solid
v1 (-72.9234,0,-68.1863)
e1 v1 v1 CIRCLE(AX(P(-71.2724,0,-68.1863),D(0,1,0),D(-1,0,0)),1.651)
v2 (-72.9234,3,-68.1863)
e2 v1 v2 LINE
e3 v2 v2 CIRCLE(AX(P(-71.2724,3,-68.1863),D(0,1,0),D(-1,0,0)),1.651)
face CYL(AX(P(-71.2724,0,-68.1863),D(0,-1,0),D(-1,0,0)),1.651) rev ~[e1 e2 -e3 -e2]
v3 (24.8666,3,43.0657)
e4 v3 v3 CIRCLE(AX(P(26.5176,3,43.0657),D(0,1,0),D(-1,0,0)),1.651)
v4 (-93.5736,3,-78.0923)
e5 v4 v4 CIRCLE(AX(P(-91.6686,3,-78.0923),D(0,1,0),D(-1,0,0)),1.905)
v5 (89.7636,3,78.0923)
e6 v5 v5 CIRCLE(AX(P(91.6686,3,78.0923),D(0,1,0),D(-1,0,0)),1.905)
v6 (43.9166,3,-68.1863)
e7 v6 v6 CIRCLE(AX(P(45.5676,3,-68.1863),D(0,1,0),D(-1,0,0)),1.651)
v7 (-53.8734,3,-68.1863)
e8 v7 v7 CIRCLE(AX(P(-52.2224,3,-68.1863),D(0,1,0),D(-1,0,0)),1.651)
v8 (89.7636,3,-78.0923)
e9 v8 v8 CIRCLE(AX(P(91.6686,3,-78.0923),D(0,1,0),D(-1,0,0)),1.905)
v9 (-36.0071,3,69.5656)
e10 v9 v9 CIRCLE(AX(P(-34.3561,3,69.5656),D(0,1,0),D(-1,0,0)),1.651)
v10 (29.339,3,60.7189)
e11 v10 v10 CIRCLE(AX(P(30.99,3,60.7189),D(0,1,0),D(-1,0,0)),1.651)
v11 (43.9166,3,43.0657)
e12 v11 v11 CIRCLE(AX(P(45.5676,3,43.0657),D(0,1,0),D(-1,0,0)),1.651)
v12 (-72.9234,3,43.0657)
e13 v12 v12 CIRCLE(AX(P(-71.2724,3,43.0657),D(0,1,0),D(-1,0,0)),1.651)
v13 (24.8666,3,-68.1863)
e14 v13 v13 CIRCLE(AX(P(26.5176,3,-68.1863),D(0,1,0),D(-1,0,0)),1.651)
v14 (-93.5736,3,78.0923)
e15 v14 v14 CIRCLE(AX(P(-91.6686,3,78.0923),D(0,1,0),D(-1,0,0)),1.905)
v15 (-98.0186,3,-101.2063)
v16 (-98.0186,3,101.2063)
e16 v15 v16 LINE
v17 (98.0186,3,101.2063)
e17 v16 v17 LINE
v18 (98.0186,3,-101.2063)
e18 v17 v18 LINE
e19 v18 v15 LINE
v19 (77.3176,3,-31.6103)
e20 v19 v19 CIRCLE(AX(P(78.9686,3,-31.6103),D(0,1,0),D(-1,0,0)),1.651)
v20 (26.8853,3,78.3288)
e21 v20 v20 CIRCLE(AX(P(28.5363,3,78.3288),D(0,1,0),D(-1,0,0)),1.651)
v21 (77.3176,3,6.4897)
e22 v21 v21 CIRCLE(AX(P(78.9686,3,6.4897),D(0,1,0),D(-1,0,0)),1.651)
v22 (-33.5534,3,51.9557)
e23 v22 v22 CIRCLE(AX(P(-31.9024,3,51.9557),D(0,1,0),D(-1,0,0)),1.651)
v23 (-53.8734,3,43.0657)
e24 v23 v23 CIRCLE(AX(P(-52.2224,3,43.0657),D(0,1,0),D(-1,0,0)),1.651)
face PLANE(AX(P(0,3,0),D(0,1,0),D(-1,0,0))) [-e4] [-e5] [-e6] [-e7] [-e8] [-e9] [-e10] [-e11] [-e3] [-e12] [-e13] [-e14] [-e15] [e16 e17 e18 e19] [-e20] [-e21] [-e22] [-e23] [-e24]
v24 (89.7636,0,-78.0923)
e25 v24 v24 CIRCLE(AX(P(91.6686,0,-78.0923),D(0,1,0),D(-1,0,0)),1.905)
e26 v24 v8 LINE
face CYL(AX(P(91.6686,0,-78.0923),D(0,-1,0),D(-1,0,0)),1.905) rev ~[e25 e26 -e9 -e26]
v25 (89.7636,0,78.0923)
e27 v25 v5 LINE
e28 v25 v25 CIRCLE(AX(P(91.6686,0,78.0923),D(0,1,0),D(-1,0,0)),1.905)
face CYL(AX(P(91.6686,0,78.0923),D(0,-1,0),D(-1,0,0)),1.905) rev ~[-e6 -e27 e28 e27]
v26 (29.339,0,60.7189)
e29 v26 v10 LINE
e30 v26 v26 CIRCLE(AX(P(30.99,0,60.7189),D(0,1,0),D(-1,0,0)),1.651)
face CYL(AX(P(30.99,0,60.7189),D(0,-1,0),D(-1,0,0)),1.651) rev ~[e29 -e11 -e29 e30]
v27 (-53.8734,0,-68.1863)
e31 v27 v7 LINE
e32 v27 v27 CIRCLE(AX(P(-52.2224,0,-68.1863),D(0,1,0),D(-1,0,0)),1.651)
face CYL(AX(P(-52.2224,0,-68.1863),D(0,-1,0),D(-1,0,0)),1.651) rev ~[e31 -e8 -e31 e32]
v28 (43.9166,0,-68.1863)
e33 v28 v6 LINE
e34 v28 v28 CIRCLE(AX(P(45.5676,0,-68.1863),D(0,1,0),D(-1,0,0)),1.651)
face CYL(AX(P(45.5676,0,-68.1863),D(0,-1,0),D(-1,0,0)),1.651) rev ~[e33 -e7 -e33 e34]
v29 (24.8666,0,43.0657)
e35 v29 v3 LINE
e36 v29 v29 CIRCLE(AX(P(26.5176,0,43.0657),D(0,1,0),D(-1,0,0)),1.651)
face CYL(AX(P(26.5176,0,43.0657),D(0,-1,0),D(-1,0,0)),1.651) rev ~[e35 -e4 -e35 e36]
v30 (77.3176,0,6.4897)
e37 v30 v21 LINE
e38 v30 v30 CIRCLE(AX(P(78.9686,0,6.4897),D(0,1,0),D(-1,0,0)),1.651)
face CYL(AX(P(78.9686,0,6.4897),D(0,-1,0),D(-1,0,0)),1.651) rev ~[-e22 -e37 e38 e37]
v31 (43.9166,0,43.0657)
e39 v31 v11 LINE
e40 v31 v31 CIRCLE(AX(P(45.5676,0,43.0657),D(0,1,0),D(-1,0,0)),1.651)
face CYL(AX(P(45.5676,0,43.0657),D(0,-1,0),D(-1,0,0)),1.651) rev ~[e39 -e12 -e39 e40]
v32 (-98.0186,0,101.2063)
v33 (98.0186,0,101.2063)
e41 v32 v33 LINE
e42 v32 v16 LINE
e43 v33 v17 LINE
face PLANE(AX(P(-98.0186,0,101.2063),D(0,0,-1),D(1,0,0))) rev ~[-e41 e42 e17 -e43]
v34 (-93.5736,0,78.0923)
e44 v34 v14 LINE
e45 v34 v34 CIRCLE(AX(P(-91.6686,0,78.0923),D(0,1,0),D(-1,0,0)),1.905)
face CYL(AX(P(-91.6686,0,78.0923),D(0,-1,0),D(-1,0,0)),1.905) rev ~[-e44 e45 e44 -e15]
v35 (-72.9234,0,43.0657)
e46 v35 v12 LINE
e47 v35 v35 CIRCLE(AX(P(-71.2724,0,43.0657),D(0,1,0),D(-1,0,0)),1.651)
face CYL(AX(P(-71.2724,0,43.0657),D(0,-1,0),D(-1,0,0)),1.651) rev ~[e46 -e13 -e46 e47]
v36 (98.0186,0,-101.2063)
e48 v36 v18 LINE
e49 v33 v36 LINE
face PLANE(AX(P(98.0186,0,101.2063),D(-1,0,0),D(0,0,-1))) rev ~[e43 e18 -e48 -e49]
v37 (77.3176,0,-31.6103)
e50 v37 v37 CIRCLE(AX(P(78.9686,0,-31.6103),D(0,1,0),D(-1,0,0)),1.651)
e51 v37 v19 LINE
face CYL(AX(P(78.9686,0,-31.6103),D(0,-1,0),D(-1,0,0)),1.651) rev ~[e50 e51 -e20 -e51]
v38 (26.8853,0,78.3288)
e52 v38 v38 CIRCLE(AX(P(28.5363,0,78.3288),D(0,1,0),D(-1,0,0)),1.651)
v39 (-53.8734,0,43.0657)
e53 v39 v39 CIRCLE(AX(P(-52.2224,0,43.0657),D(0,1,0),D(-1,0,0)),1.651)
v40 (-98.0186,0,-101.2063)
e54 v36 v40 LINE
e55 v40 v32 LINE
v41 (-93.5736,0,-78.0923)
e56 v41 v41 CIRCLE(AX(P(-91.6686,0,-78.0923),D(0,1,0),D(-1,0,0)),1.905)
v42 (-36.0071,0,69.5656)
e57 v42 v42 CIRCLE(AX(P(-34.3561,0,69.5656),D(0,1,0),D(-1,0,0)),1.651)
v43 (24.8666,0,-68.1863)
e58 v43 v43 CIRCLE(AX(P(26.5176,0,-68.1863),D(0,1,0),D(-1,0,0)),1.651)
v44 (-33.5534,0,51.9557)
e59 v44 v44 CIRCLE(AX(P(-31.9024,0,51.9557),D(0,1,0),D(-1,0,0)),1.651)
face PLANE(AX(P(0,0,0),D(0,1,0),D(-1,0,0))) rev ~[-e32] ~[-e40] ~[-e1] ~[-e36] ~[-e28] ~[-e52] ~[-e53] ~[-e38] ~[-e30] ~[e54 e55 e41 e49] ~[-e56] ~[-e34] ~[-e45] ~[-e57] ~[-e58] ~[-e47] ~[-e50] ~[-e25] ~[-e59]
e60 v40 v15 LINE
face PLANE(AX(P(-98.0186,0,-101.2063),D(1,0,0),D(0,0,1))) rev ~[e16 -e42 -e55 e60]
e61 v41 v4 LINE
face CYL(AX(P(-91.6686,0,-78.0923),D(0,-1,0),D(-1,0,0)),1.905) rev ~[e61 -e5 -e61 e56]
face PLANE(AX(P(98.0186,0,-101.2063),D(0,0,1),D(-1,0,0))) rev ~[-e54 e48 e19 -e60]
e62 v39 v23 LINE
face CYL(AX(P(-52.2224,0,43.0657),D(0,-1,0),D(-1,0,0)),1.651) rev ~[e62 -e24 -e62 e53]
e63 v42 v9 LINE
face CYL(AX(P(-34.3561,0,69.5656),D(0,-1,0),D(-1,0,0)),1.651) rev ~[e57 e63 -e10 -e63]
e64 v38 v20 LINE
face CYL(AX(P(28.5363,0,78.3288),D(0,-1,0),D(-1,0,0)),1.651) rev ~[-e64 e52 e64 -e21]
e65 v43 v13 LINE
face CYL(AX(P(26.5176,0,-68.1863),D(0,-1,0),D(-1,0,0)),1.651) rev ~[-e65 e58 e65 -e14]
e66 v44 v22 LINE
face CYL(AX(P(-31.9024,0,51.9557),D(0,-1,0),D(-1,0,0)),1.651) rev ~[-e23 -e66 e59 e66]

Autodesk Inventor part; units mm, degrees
ref_plane "YZ Plane" through (0, 0, 0) normal (1, 0, 0) x (0, 1, 0)
ref_plane "XZ Plane" through (0, 0, 0) normal (0, 1, 0) x (-1, 0, 0)
ref_plane "XY Plane" through (0, 0, 0) normal (0, 0, 1) x (1, 0, 0)
sketch "Block1" plane through (0, 0, 0) normal (0, 0, 1) x (1, 0, 0)
  circle A0 centre (244.9891, 313.0766) radius 1.651
  circle A1 centre (305.4278, 286.7035) radius 1.651
  circle A2 centre (242.5353, 295.4667) radius 1.651
  circle A3 centre (307.8815, 304.3134) radius 1.651
  circle A4 centre (325.7478, 277.8135) radius 1.651
  circle A5 centre (227.9578, 277.8135) radius 1.651
  circle A6 centre (194.5568, 203.1375) radius 1.651
  circle A7 centre (325.7478, 166.5615) radius 1.651
  circle A8 centre (227.9578, 166.5615) radius 1.651
  circle A9 centre (247.0078, 166.5615) radius 1.651
  circle A10 centre (344.7978, 166.5615) radius 1.651
  circle A11 centre (194.5568, 241.2375) radius 1.651
  circle A12 centre (247.0078, 277.8135) radius 1.651
  circle A13 centre (344.7978, 277.8135) radius 1.651
  circle A14 centre (181.8568, 156.6555) radius 1.905
  circle A15 centre (181.8568, 312.8401) radius 1.905
  circle A16 centre (365.194, 312.8401) radius 1.905
  circle A17 centre (365.194, 156.6555) radius 1.905
  line L0 (371.544, 133.5415) -> (371.544, 335.9541)
  line L1 (175.5068, 133.5415) -> (371.544, 133.5415)
  line L2 (175.5068, 335.9541) -> (175.5068, 133.5415)
  line L3 (371.544, 335.9541) -> (175.5068, 335.9541)
  point P0 (271.6644, 239.9388)
sketch "Sketch1" plane through (0, 0, 0) normal (0, 1, 0) x (-1, 0, 0)
  circle A0 centre (-28.5363, 78.3288) radius 1.651
  circle A1 centre (31.9024, 51.9557) radius 1.651
  circle A2 centre (-30.99, 60.7189) radius 1.651
  circle A3 centre (34.3561, 69.5656) radius 1.651
  circle A4 centre (52.2224, 43.0657) radius 1.651
  circle A5 centre (-45.5676, 43.0657) radius 1.651
  circle A6 centre (-78.9686, -31.6103) radius 1.651
  circle A7 centre (52.2224, -68.1863) radius 1.651
  circle A8 centre (-45.5676, -68.1863) radius 1.651
  circle A9 centre (-26.5176, -68.1863) radius 1.651
  circle A10 centre (71.2724, -68.1863) radius 1.651
  circle A11 centre (-78.9686, 6.4897) radius 1.651
  circle A12 centre (-26.5176, 43.0657) radius 1.651
  circle A13 centre (71.2724, 43.0657) radius 1.651
  circle A14 centre (-91.6686, -78.0923) radius 1.905
  circle A15 centre (-91.6686, 78.0923) radius 1.905
  circle A16 centre (91.6686, 78.0923) radius 1.905
  circle A17 centre (91.6686, -78.0923) radius 1.905
  line L0 (98.0186, -101.2063) -> (98.0186, 101.2063)
  line L1 (-98.0186, -101.2063) -> (98.0186, -101.2063)
  line L2 (-98.0186, 101.2063) -> (-98.0186, -101.2063)
  line L3 (98.0186, 101.2063) -> (-98.0186, 101.2063)
  point P0 (0, 0)
  point P1 (0, -101.2063)
  point P2 (-98.0186, 0)
extrude "Extrusion1" add sketch "Sketch1" along normal blind 3
properties part number "BottomPlate"
